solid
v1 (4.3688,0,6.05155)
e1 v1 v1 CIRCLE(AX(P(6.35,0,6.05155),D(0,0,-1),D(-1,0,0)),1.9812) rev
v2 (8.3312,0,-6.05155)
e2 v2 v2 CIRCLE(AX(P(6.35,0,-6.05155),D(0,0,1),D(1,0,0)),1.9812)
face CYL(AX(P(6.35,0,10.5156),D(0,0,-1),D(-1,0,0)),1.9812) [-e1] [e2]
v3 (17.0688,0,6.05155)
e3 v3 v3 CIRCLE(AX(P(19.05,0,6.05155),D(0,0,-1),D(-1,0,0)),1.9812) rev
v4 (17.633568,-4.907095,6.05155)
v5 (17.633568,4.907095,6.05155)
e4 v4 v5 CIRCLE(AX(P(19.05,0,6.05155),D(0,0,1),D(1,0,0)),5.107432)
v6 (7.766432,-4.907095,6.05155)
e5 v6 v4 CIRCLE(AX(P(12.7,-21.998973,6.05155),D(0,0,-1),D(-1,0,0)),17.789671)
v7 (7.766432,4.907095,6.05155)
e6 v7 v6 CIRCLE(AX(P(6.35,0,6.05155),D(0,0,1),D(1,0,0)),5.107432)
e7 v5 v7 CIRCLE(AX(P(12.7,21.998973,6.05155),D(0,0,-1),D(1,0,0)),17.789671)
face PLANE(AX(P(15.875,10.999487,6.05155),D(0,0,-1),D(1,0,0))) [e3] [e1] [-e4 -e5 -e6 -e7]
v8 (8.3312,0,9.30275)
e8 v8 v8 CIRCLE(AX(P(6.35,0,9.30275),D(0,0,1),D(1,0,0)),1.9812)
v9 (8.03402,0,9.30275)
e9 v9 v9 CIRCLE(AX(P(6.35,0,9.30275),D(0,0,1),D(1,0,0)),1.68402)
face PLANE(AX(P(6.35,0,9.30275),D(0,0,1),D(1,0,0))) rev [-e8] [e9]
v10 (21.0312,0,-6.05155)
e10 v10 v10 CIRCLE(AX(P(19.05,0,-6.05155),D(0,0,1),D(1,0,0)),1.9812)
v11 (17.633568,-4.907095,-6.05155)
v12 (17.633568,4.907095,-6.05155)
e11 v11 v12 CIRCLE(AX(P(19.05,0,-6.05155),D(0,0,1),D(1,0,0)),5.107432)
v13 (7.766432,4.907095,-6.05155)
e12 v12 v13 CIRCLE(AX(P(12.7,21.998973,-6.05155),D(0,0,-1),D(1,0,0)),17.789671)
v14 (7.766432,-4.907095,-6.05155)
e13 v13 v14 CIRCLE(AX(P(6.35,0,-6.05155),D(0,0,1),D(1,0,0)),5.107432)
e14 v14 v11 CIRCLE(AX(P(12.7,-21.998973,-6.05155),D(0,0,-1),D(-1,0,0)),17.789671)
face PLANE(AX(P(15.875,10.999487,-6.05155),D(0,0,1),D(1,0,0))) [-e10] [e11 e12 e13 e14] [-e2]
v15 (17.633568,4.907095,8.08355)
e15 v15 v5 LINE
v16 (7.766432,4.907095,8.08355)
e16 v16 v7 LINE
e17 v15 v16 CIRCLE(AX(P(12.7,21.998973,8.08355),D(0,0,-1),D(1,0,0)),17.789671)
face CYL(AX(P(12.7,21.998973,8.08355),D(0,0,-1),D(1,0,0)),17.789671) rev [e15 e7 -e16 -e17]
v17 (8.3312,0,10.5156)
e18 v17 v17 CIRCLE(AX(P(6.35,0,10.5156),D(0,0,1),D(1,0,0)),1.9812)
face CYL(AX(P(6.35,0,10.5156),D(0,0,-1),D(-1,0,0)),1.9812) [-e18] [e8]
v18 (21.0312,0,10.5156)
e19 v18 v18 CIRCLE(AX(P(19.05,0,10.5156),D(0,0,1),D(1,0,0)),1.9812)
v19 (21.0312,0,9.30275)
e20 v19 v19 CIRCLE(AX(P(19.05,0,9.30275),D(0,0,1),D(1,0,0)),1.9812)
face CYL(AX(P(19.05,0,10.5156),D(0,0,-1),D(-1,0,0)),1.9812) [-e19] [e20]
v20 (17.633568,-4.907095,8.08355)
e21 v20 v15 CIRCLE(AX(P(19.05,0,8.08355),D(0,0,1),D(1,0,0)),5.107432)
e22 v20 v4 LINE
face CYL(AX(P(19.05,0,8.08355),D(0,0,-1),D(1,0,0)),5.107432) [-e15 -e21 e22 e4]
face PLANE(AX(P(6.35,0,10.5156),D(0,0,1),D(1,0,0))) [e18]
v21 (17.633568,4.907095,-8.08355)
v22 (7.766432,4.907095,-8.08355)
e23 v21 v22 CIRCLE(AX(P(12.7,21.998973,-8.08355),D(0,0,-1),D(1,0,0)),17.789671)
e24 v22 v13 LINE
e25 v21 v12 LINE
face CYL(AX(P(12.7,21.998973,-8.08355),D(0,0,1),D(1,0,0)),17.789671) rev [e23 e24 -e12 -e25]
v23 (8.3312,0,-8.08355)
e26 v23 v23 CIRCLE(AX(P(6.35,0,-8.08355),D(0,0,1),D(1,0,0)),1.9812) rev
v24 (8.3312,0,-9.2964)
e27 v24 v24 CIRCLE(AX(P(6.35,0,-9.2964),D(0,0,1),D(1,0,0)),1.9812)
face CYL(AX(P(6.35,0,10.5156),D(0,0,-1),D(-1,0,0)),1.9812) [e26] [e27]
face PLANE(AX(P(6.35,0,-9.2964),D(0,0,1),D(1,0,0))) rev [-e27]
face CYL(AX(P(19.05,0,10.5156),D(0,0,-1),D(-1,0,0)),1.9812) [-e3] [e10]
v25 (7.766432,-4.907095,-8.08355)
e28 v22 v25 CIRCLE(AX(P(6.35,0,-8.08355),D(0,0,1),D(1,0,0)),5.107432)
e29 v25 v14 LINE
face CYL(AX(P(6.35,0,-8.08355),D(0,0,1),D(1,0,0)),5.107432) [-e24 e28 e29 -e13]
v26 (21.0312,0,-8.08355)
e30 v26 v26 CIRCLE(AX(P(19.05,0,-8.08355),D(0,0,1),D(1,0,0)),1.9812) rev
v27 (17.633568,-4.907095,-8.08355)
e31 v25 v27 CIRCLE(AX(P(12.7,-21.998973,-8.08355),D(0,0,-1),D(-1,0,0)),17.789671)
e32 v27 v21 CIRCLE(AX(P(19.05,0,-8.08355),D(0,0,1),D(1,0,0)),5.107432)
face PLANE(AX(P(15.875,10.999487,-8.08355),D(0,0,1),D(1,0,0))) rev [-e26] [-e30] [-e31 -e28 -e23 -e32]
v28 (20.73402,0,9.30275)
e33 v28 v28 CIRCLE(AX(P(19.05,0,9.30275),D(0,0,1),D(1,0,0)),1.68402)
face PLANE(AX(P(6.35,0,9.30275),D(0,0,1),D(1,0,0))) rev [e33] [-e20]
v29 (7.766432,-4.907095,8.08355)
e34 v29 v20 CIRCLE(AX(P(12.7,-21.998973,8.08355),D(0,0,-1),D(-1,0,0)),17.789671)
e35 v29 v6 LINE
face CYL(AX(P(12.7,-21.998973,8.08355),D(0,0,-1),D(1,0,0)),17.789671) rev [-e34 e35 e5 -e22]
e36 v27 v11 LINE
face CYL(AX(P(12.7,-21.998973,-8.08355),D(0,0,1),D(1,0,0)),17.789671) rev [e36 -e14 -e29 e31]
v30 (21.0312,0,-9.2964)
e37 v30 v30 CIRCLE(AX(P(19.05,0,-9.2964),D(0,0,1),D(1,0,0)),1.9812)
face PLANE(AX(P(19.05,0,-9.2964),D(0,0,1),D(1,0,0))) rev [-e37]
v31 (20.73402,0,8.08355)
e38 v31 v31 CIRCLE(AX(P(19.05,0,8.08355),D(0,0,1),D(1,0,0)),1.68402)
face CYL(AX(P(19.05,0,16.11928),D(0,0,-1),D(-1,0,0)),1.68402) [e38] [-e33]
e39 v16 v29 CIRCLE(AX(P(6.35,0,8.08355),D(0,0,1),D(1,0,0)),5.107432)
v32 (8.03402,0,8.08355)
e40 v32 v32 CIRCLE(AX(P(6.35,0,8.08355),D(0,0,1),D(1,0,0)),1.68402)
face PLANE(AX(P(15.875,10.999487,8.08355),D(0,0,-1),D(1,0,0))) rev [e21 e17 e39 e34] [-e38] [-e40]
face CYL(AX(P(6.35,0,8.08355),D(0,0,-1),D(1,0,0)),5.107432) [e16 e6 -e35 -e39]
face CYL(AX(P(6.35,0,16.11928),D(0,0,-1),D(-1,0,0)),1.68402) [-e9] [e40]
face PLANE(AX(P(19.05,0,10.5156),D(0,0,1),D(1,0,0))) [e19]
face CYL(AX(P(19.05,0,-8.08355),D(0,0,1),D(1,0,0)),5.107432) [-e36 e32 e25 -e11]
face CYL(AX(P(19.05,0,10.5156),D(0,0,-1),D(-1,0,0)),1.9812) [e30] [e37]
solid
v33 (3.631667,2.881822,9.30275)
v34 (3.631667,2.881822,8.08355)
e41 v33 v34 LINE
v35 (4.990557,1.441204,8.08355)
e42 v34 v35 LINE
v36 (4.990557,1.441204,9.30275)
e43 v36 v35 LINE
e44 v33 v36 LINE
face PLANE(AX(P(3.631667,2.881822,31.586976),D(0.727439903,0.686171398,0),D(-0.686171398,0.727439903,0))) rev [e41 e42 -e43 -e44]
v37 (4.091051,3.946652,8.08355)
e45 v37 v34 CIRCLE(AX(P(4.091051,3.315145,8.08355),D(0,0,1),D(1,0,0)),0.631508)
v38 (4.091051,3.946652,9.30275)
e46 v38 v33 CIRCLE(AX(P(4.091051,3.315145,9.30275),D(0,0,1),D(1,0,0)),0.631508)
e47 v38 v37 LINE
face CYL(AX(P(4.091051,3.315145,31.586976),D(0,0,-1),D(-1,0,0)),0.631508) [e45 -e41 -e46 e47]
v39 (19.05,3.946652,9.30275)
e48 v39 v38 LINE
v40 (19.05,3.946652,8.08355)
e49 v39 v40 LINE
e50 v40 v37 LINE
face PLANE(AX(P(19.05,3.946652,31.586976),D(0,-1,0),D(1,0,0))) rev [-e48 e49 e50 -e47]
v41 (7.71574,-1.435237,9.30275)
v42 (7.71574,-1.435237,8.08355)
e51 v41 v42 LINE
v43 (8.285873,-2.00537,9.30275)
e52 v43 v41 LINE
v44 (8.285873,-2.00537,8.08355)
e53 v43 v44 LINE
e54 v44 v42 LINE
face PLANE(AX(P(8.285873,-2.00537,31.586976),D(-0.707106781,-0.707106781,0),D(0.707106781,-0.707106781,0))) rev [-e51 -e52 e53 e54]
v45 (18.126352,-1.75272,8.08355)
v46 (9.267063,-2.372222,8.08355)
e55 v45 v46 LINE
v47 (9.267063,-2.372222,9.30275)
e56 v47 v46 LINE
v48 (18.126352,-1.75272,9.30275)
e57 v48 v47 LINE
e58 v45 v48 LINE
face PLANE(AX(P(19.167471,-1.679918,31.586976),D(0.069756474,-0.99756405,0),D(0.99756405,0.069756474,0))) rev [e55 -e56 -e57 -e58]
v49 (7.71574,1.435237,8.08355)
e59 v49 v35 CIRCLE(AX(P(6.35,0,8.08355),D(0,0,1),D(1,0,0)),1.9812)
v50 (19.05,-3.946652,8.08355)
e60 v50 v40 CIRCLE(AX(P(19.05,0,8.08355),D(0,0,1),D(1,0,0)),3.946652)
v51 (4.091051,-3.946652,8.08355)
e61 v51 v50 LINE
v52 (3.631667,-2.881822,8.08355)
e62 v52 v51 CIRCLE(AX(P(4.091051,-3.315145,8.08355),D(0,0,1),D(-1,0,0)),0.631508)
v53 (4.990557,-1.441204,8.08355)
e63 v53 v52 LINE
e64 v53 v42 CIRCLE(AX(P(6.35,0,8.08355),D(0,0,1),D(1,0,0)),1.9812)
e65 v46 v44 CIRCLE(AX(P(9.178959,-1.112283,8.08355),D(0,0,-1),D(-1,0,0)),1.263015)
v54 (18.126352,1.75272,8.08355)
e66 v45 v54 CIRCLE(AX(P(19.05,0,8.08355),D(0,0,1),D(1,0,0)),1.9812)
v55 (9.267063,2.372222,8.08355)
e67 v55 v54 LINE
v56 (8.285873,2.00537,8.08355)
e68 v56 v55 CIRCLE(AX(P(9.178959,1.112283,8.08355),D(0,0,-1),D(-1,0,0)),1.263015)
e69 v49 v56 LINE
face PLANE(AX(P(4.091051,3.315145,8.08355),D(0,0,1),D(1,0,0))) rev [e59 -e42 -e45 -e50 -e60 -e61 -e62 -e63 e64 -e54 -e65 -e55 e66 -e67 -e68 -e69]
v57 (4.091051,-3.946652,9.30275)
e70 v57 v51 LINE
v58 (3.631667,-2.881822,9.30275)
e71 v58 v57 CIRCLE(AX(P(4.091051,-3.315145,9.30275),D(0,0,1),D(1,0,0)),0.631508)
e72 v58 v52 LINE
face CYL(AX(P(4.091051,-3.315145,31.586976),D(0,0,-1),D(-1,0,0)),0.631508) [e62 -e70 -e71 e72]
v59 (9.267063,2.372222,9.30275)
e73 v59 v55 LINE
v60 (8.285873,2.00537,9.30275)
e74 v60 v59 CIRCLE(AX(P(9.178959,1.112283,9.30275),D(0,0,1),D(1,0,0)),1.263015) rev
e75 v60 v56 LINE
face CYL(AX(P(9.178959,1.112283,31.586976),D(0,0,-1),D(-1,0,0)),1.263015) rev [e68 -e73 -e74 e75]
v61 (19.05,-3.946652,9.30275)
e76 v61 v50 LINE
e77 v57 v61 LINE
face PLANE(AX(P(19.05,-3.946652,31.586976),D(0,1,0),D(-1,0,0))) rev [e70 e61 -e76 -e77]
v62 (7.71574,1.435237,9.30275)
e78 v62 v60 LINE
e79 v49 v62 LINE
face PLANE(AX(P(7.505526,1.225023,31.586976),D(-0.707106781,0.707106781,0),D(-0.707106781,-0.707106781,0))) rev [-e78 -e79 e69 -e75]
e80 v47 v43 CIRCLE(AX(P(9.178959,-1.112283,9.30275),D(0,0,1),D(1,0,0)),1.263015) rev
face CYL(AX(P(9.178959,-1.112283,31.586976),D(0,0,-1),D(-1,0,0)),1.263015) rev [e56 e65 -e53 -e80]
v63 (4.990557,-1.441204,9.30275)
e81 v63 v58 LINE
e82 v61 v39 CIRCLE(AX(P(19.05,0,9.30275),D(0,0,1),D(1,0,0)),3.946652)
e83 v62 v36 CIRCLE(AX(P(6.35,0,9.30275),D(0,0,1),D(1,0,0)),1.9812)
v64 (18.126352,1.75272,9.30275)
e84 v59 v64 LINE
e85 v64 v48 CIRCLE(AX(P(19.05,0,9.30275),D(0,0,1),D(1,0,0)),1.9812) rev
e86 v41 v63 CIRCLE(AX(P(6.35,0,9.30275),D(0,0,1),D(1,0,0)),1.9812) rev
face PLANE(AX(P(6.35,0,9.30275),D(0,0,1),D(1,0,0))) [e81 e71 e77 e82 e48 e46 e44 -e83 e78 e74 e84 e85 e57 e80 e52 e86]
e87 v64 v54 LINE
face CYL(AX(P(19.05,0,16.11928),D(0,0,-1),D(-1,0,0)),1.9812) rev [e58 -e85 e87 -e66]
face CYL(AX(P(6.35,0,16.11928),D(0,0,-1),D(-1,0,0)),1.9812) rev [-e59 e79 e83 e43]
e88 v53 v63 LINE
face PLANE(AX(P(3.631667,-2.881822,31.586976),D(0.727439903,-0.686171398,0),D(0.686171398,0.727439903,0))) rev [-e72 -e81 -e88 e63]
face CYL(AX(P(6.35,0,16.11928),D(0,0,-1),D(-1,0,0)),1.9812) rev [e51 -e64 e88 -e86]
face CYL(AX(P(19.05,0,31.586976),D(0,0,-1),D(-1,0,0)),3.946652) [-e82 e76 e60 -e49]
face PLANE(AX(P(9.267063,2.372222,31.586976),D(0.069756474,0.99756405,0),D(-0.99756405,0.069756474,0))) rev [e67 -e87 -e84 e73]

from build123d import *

# Parameters (mm, degrees)
SKETCH4_R                  = 3.9624
SKETCH4_R_2                = 2.0066
BOSS_EXTRUDE1_DEPTH        = 3.96875
SKETCH5_R                  = 1.9812
BOSS_EXTRUDE2_DEPTH        = 2.032
LPATTERN1_COUNT            = 2
LPATTERN1_PITCH            = 12.7
SKETCH7_R                  = 1.9812
BOSS_EXTRUDE3_DEPTH        = 2.032
MIRROR1_START              = 6.05155
MIRROR1_OUTLINE_R          = 1.9812
MIRROR1_DEPTH              = 2.032
BOSS_EXTRUDE4_DEPTH        = 10.5156
BOSS_EXTRUDE4_DEPTH_BACK   = 9.2964
SKETCH8_R                  = 1.9812
BOSS_EXTRUDE4_2_DEPTH      = 10.5156
BOSS_EXTRUDE4_2_DEPTH_BACK = 9.2964
BOSS_EXTRUDE5_DEPTH        = 1.2192
SKETCH12_R                 = 1.9812
SKETCH12_R_2               = 1.68402
CUT_EXTRUDE1_DEPTH         = 1.2192


# Read off the part's stored shape, not the designer's step: Mirror1
with BuildPart() as part:
    # Sketch4 → Boss-Extrude1 (new, symmetric)
    with BuildSketch(Plane.XY):
        with Locations((6.35, 0)):
            Circle(SKETCH4_R)
        with Locations((6.35, 0)):
            Circle(SKETCH4_R_2, mode=Mode.SUBTRACT)
    extrude(amount=BOSS_EXTRUDE1_DEPTH, both=True)


with BuildPart() as body_2:
    # Sketch5 → Boss-Extrude2 (new body)
    with BuildSketch(Plane.XY.offset(3.96875)):
        with BuildLine():
            ThreePointArc((-4.787931893, 5.589740462), (-12.1539, 0), (-4.787931893, -5.589740462))
            ThreePointArc((-4.787931893, -5.589740462), (0, -4.933315), (4.787931893, -5.589740462))
            ThreePointArc((4.787931893, -5.589740462), (12.1539, 0), (4.787931893, 5.589740462))
            ThreePointArc((4.787931893, 5.589740462), (0, 4.933315), (-4.787931893, 5.589740462))
        make_face()
        with Locations((-6.35, 0)):
            Circle(SKETCH5_R, mode=Mode.SUBTRACT)
        with Locations((6.35, 0)):
            Circle(SKETCH5_R, mode=Mode.SUBTRACT)
    extrude(amount=BOSS_EXTRUDE2_DEPTH)


with BuildPart() as lpattern1_1:
    # LPattern1: pattern copy
    add(part.part.moved(Location(Vector(1, 0, 0) * (1 * LPATTERN1_PITCH))))


with BuildPart() as body_4:
    # Sketch7 → Boss-Extrude3 (new body)
    with BuildSketch(Plane.XY.offset(-6.05155)):
        with BuildLine():
            ThreePointArc((7.766432158, 4.907095024), (1.242568, 0), (7.766432158, -4.907095024))
            ThreePointArc((7.766432158, -4.907095024), (12.7, -4.209302295), (17.633567842, -4.907095024))
            ThreePointArc((17.633567842, -4.907095024), (24.157432, 0), (17.633567842, 4.907095024))
            ThreePointArc((17.633567842, 4.907095024), (12.7, 4.209302295), (7.766432158, 4.907095024))
        make_face()
        with Locations((6.35, 0)):
            Circle(SKETCH7_R, mode=Mode.SUBTRACT)
        with Locations((19.05, 0)):
            Circle(SKETCH7_R, mode=Mode.SUBTRACT)
    extrude(amount=-BOSS_EXTRUDE3_DEPTH)


with BuildPart() as body_5:
    # Mirror1 outline → Mirror1 (new body)
    with BuildSketch(Plane.XY.offset(MIRROR1_START)):
        with BuildLine():
            ThreePointArc((17.633567842, -4.907095024), (24.157432, 0), (17.633567842, 4.907095024))
            ThreePointArc((17.633567842, 4.907095024), (12.7, 4.209302295), (7.766432158, 4.907095024))
            ThreePointArc((7.766432158, 4.907095024), (1.242568, 0), (7.766432158, -4.907095024))
            ThreePointArc((7.766432158, -4.907095024), (12.7, -4.209302295), (17.633567842, -4.907095024))
        make_face()
        with Locations((6.35, 0)):
            Circle(MIRROR1_OUTLINE_R, mode=Mode.SUBTRACT)
        with Locations((19.05, 0)):
            Circle(MIRROR1_OUTLINE_R, mode=Mode.SUBTRACT)
    extrude(amount=MIRROR1_DEPTH)


with BuildPart() as body_3:
    # Sketch8 → Boss-Extrude4 (new, two sides: drawn at the far end of the back side and taken through both)
    with BuildSketch(Plane.XY.offset(-BOSS_EXTRUDE4_DEPTH_BACK)):
        with Locations((6.35, 0)):
            Circle(SKETCH8_R)
    extrude(amount=BOSS_EXTRUDE4_DEPTH + BOSS_EXTRUDE4_DEPTH_BACK)


with BuildPart() as body_4_2:
    # Sketch8 → Boss-Extrude4 2 (new, two sides: drawn at the far end of the back side and taken through both)
    with BuildSketch(Plane.XY.offset(-BOSS_EXTRUDE4_2_DEPTH_BACK)):
        with Locations((19.05, 0)):
            Circle(SKETCH8_R)
    extrude(amount=BOSS_EXTRUDE4_2_DEPTH + BOSS_EXTRUDE4_2_DEPTH_BACK)


with BuildPart() as body_5_2:
    # Sketch10 → Boss-Extrude5 (new body)
    with BuildSketch(Plane.XY.offset(8.08355)):
        with BuildLine():
            Line((19.05, -3.946652), (4.091050732, -3.946652))
            ThreePointArc((4.091050732, -3.946652), (3.511202451, -3.565299839), (3.631666978, -2.881822116))
            Line((3.631666978, -2.881822116), (5.194473642, -1.225023345))
            ThreePointArc((5.194473642, -1.225023345), (6.35, -1.68402), (7.505526358, -1.225023345))
            Line((7.505526358, -1.225023345), (8.285872934, -2.005369922))
            ThreePointArc((8.285872934, -2.005369922), (8.73664223, -2.295314476), (9.267062878, -2.37222181))
            Line((9.267062878, -2.37222181), (19.167471297, -1.679917812))
            ThreePointArc((19.167471297, -1.679917812), (20.73402, 0), (19.167471297, 1.679917812))
            Line((19.167471297, 1.679917812), (9.267062878, 2.37222181))
            ThreePointArc((9.267062878, 2.37222181), (8.73664223, 2.295314476), (8.285872934, 2.005369922))
            Line((8.285872934, 2.005369922), (7.505526358, 1.225023345))
            ThreePointArc((7.505526358, 1.225023345), (6.35, 1.68402), (5.194473642, 1.225023345))
            Line((5.194473642, 1.225023345), (3.631666978, 2.881822116))
            ThreePointArc((3.631666978, 2.881822116), (3.511202451, 3.565299839), (4.091050732, 3.946652))
            Line((4.091050732, 3.946652), (19.05, 3.946652))
            ThreePointArc((19.05, 3.946652), (22.996652, 0), (19.05, -3.946652))
        make_face()
    extrude(amount=BOSS_EXTRUDE5_DEPTH)


with BuildPart() as cut_extrude1_tool:
    # Sketch12 → Cut-Extrude1 (new body)
    # profile 1 of 2: a face of its own
    with BuildSketch(Plane.XY.offset(8.08355)):
        with Locations((6.35, 0)):
            Circle(SKETCH12_R)
        with Locations((6.35, 0)):
            Circle(SKETCH12_R_2, mode=Mode.SUBTRACT)
    # profile 2 of 2: a face of its own
    with BuildSketch(Plane.XY.offset(8.08355)):
        with Locations((19.05, 0)):
            Circle(SKETCH12_R)
        with Locations((19.05, 0)):
            Circle(SKETCH12_R_2, mode=Mode.SUBTRACT)
    extrude(amount=CUT_EXTRUDE1_DEPTH)


with BuildPart() as body_3_1:
    add(body_3.part)

    # Cut-Extrude1: cut by cut_extrude1_tool
    add(cut_extrude1_tool.part, mode=Mode.SUBTRACT)


with BuildPart() as body_4_2_1:
    add(body_4_2.part)

    # Cut-Extrude1: cut by cut_extrude1_tool
    add(cut_extrude1_tool.part, mode=Mode.SUBTRACT)


with BuildPart() as body_5_2_1:
    add(body_5_2.part)

    # Cut-Extrude1: cut by cut_extrude1_tool
    add(cut_extrude1_tool.part, mode=Mode.SUBTRACT)


with BuildPart() as body_4_1:
    add(body_4.part)

    # Combine3: union body 5, body 4 2, body 3
    add(body_5.part)
    add(body_4_2_1.part)
    add(body_3_1.part)


solid = Compound([body_5_2_1.part, body_4_1.part])
